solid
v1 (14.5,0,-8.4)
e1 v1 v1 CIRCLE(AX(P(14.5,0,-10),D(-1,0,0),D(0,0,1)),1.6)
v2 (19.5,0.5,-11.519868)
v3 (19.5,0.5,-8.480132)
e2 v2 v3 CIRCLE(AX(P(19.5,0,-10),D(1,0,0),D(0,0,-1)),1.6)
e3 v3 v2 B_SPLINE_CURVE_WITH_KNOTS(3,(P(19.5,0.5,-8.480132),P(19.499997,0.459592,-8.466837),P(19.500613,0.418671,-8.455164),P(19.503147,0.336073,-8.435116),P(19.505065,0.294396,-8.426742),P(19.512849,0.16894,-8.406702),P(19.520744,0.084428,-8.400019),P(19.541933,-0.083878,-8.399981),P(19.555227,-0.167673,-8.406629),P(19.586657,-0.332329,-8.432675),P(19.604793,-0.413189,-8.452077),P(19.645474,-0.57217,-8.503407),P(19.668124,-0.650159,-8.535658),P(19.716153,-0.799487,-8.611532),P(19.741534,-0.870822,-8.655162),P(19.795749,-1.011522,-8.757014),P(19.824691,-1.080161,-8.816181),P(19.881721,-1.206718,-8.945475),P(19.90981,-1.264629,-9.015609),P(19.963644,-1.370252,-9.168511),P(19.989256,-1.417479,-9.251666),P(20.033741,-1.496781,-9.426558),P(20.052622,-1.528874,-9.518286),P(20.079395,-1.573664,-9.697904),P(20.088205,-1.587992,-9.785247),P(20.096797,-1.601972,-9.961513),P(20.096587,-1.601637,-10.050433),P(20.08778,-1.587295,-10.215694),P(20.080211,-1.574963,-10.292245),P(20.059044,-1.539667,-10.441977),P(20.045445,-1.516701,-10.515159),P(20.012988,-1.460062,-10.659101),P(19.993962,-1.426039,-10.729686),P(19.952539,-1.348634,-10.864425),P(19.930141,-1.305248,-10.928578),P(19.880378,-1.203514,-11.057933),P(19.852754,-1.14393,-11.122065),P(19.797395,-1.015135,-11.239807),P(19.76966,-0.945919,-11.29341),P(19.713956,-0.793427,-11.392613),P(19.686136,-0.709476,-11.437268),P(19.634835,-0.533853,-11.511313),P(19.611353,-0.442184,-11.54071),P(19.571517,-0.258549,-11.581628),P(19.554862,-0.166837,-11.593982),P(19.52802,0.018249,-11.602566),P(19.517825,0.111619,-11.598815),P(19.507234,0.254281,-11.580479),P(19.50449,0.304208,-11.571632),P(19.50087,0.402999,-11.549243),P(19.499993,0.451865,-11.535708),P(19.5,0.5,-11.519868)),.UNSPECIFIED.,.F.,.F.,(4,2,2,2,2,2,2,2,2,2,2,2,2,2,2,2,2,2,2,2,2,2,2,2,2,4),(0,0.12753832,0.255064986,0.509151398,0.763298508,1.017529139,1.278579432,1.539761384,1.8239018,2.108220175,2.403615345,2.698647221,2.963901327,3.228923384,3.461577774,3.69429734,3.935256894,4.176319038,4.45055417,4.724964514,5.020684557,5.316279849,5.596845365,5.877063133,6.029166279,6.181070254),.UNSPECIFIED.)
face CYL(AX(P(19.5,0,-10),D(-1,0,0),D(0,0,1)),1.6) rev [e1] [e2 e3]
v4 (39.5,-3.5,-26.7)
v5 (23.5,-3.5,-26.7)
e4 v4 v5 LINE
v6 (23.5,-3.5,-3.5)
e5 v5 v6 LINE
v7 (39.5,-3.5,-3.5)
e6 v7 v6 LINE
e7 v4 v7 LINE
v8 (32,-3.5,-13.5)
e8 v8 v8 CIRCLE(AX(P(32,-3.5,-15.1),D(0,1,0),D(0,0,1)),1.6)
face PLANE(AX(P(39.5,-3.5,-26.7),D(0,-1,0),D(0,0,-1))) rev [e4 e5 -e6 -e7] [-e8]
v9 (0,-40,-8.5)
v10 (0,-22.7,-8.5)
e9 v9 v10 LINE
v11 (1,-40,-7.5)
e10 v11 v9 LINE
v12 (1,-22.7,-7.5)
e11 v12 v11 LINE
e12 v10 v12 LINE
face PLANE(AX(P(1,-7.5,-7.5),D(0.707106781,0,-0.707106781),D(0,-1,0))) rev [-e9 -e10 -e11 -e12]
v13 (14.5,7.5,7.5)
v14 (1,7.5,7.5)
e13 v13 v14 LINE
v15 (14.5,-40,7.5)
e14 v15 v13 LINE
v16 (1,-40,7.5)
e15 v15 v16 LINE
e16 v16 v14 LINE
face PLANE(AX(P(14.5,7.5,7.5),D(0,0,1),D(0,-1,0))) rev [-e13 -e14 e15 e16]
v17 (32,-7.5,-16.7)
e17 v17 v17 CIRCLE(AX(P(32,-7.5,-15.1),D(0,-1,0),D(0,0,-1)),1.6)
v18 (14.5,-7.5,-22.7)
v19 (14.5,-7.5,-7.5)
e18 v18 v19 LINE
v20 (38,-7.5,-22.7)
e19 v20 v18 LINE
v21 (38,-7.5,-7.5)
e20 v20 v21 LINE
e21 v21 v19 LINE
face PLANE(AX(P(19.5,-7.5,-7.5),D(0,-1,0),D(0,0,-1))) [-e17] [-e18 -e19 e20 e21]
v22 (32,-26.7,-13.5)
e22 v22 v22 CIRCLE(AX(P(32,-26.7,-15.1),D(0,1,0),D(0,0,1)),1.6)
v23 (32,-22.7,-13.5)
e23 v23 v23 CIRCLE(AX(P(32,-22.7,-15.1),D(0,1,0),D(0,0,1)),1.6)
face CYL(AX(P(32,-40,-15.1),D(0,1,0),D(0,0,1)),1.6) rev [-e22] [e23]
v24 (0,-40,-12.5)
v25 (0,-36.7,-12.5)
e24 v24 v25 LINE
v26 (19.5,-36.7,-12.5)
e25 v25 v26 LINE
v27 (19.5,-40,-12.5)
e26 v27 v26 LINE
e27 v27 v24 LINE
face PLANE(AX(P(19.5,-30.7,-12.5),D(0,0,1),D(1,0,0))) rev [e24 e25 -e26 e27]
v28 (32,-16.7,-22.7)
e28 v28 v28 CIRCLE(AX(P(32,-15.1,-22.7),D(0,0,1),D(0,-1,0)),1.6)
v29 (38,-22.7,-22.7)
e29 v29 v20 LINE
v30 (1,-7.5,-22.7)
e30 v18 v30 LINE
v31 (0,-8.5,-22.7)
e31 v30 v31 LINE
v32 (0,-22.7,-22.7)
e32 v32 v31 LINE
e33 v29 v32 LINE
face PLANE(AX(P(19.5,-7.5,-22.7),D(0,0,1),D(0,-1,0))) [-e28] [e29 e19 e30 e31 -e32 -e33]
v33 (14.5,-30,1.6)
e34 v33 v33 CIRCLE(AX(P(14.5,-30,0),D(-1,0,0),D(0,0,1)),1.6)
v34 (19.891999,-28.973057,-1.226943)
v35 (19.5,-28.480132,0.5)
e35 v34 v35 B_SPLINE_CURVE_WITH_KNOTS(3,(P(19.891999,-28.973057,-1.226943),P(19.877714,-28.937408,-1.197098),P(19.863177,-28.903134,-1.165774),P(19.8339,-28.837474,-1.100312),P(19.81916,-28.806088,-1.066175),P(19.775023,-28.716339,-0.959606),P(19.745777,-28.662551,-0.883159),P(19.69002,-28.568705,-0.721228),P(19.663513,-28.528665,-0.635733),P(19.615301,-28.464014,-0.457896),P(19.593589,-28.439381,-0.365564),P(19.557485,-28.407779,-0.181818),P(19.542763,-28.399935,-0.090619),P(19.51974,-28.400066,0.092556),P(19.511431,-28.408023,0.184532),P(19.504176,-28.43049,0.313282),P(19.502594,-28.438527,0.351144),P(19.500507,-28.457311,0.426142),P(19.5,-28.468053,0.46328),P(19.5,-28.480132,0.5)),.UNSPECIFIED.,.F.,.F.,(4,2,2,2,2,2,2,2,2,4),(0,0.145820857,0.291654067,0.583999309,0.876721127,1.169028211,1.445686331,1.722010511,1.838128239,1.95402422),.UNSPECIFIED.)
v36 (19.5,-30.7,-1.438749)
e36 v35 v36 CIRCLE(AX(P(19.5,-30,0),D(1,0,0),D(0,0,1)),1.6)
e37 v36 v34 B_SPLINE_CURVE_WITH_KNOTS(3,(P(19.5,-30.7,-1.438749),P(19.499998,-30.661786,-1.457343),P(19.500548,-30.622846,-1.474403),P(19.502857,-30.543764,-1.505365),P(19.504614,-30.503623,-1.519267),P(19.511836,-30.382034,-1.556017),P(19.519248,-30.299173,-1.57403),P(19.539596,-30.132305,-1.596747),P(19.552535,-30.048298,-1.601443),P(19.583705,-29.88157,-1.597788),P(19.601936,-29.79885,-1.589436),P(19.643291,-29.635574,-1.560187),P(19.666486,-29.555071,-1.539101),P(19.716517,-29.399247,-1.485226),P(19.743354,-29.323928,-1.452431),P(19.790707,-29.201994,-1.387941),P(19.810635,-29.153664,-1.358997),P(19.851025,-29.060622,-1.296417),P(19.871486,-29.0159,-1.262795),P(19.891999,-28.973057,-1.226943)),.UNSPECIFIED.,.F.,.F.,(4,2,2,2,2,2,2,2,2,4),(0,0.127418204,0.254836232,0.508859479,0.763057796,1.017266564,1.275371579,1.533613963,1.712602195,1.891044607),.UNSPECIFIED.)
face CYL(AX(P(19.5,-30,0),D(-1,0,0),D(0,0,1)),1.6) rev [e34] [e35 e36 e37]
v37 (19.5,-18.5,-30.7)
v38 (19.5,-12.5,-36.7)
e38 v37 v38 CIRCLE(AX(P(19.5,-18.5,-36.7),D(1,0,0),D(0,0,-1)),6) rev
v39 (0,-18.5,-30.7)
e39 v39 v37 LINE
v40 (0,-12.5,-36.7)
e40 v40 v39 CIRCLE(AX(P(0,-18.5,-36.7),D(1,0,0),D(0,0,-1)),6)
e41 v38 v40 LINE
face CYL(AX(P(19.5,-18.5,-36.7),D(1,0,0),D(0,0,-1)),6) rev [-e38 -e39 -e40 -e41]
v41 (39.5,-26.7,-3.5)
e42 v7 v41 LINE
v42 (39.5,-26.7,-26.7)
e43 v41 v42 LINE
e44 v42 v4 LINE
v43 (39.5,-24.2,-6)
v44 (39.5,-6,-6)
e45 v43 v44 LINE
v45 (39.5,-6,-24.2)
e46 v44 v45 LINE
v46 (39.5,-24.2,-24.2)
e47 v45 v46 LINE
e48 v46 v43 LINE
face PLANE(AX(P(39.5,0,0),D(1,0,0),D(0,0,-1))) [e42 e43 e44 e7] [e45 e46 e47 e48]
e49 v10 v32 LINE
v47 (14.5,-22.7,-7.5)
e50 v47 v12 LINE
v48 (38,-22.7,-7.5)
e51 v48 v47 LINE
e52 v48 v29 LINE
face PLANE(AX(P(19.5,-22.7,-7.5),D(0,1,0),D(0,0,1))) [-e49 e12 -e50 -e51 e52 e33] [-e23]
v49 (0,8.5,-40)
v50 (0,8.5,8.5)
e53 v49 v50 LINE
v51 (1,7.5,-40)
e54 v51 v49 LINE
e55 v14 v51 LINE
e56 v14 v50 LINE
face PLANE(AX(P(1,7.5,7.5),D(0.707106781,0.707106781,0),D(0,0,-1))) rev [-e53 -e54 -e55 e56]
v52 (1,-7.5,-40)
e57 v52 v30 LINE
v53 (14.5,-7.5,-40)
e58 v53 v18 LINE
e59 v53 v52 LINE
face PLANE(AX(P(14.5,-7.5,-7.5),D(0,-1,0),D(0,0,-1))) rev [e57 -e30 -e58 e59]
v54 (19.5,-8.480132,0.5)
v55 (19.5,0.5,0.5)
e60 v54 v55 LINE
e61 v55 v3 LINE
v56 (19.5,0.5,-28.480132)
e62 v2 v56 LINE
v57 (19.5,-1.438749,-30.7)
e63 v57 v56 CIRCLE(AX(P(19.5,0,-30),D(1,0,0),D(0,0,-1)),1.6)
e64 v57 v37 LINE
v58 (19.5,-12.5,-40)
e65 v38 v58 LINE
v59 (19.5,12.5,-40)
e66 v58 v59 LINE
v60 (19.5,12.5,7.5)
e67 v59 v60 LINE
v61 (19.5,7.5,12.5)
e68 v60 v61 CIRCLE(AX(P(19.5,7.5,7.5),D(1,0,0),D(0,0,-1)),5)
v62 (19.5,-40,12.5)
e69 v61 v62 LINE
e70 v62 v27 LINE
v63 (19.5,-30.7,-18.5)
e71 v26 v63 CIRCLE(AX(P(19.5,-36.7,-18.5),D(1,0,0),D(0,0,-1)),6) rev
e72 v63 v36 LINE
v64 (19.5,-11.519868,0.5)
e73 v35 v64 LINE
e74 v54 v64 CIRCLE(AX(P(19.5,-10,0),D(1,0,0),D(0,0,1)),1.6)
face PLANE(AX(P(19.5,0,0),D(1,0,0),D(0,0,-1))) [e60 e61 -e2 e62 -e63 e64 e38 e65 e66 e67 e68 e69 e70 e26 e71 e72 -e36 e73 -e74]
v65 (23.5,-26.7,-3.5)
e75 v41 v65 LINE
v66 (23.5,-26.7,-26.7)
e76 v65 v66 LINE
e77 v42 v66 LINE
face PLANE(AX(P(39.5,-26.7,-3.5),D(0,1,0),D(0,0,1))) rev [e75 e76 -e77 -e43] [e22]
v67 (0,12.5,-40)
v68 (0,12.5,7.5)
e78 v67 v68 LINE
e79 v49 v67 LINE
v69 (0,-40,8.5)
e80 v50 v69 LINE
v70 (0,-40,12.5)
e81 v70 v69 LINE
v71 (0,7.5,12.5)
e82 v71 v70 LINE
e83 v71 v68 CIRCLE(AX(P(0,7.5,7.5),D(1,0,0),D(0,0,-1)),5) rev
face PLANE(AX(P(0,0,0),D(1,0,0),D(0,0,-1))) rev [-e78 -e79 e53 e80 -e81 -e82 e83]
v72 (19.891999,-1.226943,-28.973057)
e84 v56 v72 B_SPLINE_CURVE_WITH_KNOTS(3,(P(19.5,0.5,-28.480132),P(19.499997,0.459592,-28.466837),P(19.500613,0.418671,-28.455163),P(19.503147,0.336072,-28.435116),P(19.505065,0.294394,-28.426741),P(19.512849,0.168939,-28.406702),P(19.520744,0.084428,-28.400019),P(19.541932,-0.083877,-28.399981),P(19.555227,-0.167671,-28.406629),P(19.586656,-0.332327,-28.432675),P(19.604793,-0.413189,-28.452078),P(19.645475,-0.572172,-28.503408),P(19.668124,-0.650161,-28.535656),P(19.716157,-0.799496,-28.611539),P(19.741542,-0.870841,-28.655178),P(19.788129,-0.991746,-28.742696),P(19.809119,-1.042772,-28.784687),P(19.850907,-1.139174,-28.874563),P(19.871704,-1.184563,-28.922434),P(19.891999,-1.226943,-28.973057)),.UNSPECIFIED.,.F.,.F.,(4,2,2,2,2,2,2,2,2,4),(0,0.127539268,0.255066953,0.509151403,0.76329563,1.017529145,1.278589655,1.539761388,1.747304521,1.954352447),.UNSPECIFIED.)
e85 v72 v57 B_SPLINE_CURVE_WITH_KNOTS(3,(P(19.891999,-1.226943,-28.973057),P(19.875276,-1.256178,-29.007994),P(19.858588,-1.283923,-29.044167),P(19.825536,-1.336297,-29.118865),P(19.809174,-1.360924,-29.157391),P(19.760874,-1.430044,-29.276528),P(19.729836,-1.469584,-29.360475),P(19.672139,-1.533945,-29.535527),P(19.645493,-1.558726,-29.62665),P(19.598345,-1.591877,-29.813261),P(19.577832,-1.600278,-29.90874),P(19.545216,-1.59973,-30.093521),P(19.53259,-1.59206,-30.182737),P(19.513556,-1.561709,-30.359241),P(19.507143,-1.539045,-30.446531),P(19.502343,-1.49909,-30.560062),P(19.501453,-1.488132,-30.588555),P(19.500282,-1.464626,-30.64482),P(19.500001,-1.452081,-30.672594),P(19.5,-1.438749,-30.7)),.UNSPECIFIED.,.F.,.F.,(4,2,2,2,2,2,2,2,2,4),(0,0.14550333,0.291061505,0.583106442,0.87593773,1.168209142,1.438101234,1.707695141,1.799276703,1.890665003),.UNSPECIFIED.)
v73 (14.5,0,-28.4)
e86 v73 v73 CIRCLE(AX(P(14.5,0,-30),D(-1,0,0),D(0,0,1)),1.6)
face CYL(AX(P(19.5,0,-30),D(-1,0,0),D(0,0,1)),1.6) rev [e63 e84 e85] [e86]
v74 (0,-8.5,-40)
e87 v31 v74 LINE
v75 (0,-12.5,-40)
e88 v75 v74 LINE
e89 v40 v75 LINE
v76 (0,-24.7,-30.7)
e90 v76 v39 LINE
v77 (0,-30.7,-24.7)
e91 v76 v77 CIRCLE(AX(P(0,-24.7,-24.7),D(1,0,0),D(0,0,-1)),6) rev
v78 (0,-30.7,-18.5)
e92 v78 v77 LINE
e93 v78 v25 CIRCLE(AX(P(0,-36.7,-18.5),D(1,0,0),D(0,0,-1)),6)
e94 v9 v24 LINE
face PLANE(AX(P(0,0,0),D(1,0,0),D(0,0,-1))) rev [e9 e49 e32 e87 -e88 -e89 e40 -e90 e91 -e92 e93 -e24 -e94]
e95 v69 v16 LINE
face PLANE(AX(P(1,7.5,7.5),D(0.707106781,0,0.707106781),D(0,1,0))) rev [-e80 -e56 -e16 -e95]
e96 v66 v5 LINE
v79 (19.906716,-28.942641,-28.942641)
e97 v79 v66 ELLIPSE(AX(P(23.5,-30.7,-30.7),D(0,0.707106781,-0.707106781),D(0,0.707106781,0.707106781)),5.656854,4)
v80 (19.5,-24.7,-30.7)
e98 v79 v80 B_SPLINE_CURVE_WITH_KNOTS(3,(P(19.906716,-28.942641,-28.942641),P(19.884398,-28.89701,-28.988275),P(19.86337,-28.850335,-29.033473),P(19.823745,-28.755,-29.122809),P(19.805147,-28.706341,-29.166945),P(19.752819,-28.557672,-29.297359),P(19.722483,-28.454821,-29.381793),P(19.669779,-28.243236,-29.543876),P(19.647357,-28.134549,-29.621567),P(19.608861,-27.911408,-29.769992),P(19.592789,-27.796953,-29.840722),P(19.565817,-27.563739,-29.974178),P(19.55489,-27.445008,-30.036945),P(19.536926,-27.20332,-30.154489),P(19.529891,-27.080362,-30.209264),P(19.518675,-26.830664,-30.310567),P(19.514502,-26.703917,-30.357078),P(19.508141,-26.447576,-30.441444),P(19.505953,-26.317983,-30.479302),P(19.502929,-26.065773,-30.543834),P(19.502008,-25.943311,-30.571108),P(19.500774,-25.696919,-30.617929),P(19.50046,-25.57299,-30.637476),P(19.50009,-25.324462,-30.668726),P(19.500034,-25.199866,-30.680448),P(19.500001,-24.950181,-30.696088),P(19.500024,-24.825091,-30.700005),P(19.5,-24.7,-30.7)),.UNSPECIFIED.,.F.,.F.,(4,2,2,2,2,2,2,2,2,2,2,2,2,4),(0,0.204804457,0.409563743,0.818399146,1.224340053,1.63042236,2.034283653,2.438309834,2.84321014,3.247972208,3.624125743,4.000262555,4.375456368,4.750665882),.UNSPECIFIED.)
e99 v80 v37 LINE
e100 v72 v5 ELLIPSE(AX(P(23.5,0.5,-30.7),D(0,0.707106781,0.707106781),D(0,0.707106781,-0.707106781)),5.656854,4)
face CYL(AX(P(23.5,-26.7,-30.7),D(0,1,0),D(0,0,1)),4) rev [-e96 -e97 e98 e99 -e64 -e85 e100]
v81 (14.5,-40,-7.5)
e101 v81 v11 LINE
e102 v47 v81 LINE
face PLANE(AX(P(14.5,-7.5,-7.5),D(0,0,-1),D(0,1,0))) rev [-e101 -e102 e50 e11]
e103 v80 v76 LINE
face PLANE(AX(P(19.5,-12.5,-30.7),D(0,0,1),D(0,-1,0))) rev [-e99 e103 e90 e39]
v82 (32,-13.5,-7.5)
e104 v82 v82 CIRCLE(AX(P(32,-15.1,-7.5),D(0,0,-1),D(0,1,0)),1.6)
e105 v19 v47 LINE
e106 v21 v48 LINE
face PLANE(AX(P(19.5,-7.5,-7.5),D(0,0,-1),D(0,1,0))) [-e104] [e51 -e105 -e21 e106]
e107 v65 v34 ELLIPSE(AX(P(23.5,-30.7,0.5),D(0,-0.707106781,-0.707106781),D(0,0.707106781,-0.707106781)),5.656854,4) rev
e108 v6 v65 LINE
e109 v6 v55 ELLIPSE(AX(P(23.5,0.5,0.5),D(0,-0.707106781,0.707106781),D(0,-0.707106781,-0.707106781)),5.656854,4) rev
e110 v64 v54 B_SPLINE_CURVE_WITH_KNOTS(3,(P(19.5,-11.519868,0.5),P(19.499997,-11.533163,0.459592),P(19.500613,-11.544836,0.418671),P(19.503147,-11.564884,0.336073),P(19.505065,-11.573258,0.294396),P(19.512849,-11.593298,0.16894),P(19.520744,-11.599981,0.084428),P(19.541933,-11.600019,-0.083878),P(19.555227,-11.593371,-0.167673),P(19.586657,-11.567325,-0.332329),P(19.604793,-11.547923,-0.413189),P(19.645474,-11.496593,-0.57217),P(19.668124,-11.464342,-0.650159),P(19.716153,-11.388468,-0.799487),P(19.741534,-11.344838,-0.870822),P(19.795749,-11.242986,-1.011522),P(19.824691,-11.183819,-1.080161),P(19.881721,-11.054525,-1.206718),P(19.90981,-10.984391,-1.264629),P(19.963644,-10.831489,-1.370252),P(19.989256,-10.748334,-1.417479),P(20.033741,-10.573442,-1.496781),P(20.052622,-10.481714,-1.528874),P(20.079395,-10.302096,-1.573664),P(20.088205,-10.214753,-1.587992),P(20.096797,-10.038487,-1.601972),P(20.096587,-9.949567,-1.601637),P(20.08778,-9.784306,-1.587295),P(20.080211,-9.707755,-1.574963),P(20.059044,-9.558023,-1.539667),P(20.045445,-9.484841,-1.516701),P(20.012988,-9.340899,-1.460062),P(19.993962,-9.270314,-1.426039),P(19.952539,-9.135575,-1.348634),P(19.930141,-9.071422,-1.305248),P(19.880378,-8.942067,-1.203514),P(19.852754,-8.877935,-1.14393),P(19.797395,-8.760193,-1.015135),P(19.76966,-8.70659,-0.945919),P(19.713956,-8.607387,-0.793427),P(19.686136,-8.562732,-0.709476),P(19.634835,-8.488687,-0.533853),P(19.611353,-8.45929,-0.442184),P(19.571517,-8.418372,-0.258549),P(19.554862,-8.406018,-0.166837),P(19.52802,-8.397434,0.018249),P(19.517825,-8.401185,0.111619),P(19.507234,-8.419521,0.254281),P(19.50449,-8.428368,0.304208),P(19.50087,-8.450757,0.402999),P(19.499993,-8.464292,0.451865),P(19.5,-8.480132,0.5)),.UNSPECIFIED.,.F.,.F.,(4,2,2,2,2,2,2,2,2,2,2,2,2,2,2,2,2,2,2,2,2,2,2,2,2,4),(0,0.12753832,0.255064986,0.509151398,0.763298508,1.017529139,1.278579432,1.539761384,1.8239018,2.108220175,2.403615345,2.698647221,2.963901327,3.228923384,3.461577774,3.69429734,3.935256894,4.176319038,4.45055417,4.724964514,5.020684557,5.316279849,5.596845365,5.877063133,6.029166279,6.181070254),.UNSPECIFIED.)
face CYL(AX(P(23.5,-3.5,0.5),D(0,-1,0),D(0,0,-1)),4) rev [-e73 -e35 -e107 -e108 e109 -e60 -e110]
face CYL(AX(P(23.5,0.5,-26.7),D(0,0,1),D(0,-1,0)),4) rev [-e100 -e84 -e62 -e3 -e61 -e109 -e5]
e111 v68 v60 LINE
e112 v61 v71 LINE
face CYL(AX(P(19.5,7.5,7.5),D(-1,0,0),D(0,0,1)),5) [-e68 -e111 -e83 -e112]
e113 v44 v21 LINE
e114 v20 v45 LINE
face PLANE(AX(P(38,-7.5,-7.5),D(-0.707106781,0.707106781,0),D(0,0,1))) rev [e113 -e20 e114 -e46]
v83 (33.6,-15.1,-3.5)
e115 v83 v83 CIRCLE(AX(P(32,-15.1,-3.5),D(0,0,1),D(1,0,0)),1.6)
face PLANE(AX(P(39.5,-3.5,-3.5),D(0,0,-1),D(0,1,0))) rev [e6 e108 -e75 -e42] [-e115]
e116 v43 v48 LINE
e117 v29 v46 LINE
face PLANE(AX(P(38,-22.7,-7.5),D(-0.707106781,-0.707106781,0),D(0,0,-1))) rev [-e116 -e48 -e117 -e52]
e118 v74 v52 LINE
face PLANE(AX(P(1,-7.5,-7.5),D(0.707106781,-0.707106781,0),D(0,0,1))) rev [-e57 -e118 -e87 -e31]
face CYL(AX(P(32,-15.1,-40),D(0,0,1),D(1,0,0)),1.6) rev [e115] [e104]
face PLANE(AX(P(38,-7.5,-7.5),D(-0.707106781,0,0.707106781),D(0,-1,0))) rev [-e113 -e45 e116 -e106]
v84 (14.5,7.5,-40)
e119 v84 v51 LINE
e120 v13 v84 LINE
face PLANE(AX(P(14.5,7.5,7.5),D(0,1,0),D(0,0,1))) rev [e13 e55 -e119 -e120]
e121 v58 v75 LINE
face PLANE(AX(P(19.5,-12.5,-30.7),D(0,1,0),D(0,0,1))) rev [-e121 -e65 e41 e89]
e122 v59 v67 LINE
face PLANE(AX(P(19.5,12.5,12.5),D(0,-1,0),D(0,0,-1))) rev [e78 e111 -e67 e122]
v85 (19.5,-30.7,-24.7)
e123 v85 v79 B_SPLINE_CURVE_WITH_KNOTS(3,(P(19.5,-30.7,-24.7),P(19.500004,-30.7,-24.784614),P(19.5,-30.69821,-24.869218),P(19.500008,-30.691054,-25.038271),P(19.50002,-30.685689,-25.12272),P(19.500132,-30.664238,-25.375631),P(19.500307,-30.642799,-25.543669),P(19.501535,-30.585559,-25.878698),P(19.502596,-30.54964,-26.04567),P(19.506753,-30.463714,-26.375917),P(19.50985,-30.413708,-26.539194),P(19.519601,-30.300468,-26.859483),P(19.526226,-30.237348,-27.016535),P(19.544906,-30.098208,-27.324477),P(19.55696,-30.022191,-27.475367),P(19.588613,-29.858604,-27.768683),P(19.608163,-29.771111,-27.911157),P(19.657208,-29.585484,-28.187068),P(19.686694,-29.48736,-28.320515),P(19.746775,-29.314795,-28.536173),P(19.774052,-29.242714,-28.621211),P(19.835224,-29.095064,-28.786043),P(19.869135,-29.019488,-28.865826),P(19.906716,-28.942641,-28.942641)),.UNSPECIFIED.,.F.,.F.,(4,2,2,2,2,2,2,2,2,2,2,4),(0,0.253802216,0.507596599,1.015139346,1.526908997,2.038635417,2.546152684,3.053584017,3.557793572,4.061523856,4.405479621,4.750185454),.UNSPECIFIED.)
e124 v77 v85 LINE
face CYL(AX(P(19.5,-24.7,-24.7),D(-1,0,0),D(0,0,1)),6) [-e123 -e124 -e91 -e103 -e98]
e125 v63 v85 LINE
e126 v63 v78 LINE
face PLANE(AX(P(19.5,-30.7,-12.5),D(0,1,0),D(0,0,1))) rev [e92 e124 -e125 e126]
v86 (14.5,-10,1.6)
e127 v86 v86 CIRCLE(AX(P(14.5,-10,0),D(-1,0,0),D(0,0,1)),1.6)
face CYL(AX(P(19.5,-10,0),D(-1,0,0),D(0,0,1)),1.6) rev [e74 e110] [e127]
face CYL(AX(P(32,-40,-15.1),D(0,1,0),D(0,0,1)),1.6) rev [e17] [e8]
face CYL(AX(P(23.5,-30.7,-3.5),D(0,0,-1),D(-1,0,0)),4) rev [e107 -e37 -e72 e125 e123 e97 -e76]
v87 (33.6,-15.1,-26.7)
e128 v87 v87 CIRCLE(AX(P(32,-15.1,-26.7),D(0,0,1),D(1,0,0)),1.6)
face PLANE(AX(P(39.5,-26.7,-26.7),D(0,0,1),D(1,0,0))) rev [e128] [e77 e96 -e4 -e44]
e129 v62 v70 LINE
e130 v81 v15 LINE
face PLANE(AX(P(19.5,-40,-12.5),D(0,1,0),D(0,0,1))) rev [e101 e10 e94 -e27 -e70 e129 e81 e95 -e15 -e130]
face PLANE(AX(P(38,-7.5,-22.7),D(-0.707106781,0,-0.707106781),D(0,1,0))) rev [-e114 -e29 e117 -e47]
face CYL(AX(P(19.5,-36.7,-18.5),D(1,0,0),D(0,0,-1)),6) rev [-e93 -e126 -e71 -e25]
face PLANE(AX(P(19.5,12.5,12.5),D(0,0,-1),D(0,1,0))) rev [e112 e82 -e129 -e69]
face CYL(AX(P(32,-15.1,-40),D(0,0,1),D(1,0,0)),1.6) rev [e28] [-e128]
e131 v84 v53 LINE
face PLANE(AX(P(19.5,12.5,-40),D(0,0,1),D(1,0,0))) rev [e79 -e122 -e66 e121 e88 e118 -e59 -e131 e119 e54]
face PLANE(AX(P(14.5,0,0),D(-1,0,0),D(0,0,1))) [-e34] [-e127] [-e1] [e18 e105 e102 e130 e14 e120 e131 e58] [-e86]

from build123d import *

# Parameters (mm, degrees)
SKETCH_1_R          = 1.6
SKETCH_1_W          = 15.2
SKETCH_1_H          = 15.2
EXTRUDE_1_DEPTH     = 19.5
CUT_EXTRUDE_1_DEPTH = 14.5
SKETCH_3_W          = 23.2
SKETCH_3_H          = 23.2
SKETCH_3_W_2        = 15.2
SKETCH_3_H_2        = 15.2
EXTRUDE_2_DEPTH     = 20
FILLET_1_R          = 4
FILLET_2_R          = 6
CHAMFER_1_SIZE      = 1.5
CHAMFER_2_SIZE      = 1
SKETCH_4_R          = 1.6
CUT_EXTRUDE_2_DEPTH = 68.026114314
SKETCH_5_R          = 1.6
CUT_EXTRUDE_3_DEPTH = 68.026114314
FILLET_3_R          = 5


with BuildPart() as part:
    # 草图1 → 凸台-拉伸1 (new body)
    with BuildSketch(Plane(origin=(0, 0, 0), x_dir=(0, 0, -1), z_dir=(1, 0, 0))):
        Polygon((12.5, -30.7), (30.7, -30.7), (30.7, -12.5), (40, -12.5), (40, 12.5), (-12.5, 12.5), (-12.5, -40), (12.5, -40), align=None)
        with Locations((10, 0)):
            Circle(SKETCH_1_R, mode=Mode.SUBTRACT)
        with Locations((30, 0)):
            Circle(SKETCH_1_R, mode=Mode.SUBTRACT)
        with Locations(Location((0, -30, 0), (0, 0, 180))):
            Circle(SKETCH_1_R, mode=Mode.SUBTRACT)
        with Locations(Location((0, -10, 0), (0, 0, 180))):
            Circle(SKETCH_1_R, mode=Mode.SUBTRACT)
        with Locations((15.1, -15.1)):
            Rectangle(SKETCH_1_W, SKETCH_1_H, mode=Mode.SUBTRACT)
    extrude(amount=EXTRUDE_1_DEPTH)

    # 草图2 → 切除-拉伸1 (cut)
    with BuildSketch(Plane.ZY):
        Polygon((7.5, 7.5), (7.5, -40), (-7.5, -40), (-7.5, -7.5), (-40, -7.5), (-40, 7.5), align=None)
    extrude(amount=-CUT_EXTRUDE_1_DEPTH, mode=Mode.SUBTRACT)

    # 草图3 → 凸台-拉伸2 (add)
    with BuildSketch(Plane(origin=(19.5, 0, 0), x_dir=(0, 0, -1), z_dir=(1, 0, 0))):
        with Locations((15.1, -15.1)):
            Rectangle(SKETCH_3_W, SKETCH_3_H)
        with Locations((15.1, -15.1)):
            Rectangle(SKETCH_3_W_2, SKETCH_3_H_2, mode=Mode.SUBTRACT)
    extrude(amount=EXTRUDE_2_DEPTH)

    # 圆角1
    # the kernel refuses this fillet: 4 mm, written as the material it adds along each edge
    with BuildSketch(Plane(origin=(19.5, -3.5, -3.5), x_dir=(0, 0, 1), z_dir=(0, -1, 0))) as fillet_1_piece_1_section:
        with BuildLine():
            CenterArc((FILLET_1_R, -FILLET_1_R), FILLET_1_R, 90, 90)
            Line((0, -FILLET_1_R), (0, 0))
            Line((0, 0), (FILLET_1_R, 0))
        make_face()
    fillet_1_piece_1 = extrude(amount=23.2, mode=Mode.PRIVATE)
    fillet_1_piece_1 = fillet_1_piece_1 - Plane(origin=(20.41689995, -10, 0), x_dir=(0, 0, 1), z_dir=(-1, 0, 0)) * Cylinder(1.6, 63, mode=Mode.PRIVATE)
    add(fillet_1_piece_1)
    with BuildSketch(Plane(origin=(19.5, -26.7, -3.5), x_dir=(0, -1, 0), z_dir=(0, 0, -1)), Plane(origin=(19.5, -26.7, -26.7), x_dir=(0, 0, -1), z_dir=(0, 1, 0))) as fillet_1_piece_2:
        with BuildLine():
            CenterArc((FILLET_1_R, -FILLET_1_R), FILLET_1_R, 90, 90)
            Line((0, -FILLET_1_R), (0, 0))
            Line((0, 0), (FILLET_1_R, 0))
        make_face()
    extrude(amount=23.2)
    with BuildSketch(Plane(origin=(19.5, -3.5, -26.7), x_dir=(0, 1, 0), z_dir=(0, 0, 1))) as fillet_1_piece_3_section:
        with BuildLine():
            CenterArc((FILLET_1_R, -FILLET_1_R), FILLET_1_R, 90, 90)
            Line((0, -FILLET_1_R), (0, 0))
            Line((0, 0), (FILLET_1_R, 0))
        make_face()
    fillet_1_piece_3 = extrude(amount=23.2, mode=Mode.PRIVATE)
    fillet_1_piece_3 = fillet_1_piece_3 - Plane(origin=(20.416900014, 0, -10), x_dir=(0, 0, -1), z_dir=(-1, 0, 0)) * Cylinder(1.6, 63, mode=Mode.PRIVATE)
    add(fillet_1_piece_3)
    with BuildSketch(Plane(origin=(19.5, -3.5, -26.7), x_dir=(0, 1, 0), z_dir=(0, 0, 1))) as fillet_1_piece_4a_section:
        with BuildLine():
            CenterArc((FILLET_1_R, -FILLET_1_R), FILLET_1_R, 90, 90)
            Line((0, -FILLET_1_R), (0, 0))
            Line((0, 0), (FILLET_1_R, 0))
        make_face()
    fillet_1_piece_4a = extrude(amount=33.2, mode=Mode.PRIVATE)
    fillet_1_piece_4a = split(fillet_1_piece_4a, bisect_by=Plane(origin=(20.405580457, -2.594419543, -3.5), z_dir=(0, 0, 1)), keep=Keep.TOP, mode=Mode.PRIVATE)
    with BuildSketch(Plane(origin=(19.5, 6.5, -3.5), x_dir=(0, 0, 1), z_dir=(0, -1, 0))) as fillet_1_piece_4b_section:
        with BuildLine():
            CenterArc((FILLET_1_R, -FILLET_1_R), FILLET_1_R, 90, 90)
            Line((0, -FILLET_1_R), (0, 0))
            Line((0, 0), (FILLET_1_R, 0))
        make_face()
    fillet_1_piece_4b = extrude(amount=33.2, mode=Mode.PRIVATE)
    fillet_1_piece_4b = split(fillet_1_piece_4b, bisect_by=Plane(origin=(20.405580457, -3.5, -2.594419543), z_dir=(0, 1, 0)), keep=Keep.TOP, mode=Mode.PRIVATE)
    fillet_1_piece_4 = fillet_1_piece_4a & fillet_1_piece_4b
    add(fillet_1_piece_4)
    with BuildSketch(Plane(origin=(19.5, -26.7, 6.5), x_dir=(0, -1, 0), z_dir=(0, 0, -1))) as fillet_1_piece_5a_section:
        with BuildLine():
            CenterArc((FILLET_1_R, -FILLET_1_R), FILLET_1_R, 90, 90)
            Line((0, -FILLET_1_R), (0, 0))
            Line((0, 0), (FILLET_1_R, 0))
        make_face()
    fillet_1_piece_5a = extrude(amount=33.2, mode=Mode.PRIVATE)
    fillet_1_piece_5a = fillet_1_piece_5a - Plane(origin=(20.438690709, -30, 0), x_dir=(0, 0, 1), z_dir=(-1, 0, 0)) * Cylinder(1.6, 83, mode=Mode.PRIVATE)
    fillet_1_piece_5a = split(fillet_1_piece_5a, bisect_by=Plane(origin=(20.438690709, -27.535460333, -3.5), z_dir=(0, 0, 1)), keep=Keep.TOP, mode=Mode.PRIVATE)
    with BuildSketch(Plane(origin=(19.5, -3.5, -3.5), x_dir=(0, 0, 1), z_dir=(0, -1, 0))) as fillet_1_piece_5b_section:
        with BuildLine():
            CenterArc((FILLET_1_R, -FILLET_1_R), FILLET_1_R, 90, 90)
            Line((0, -FILLET_1_R), (0, 0))
            Line((0, 0), (FILLET_1_R, 0))
        make_face()
    fillet_1_piece_5b = extrude(amount=33.2, mode=Mode.PRIVATE)
    fillet_1_piece_5b = fillet_1_piece_5b - Plane(origin=(20.432327139, -30, 0), x_dir=(0, 0, 1), z_dir=(-1, 0, 0)) * Cylinder(1.6, 83, mode=Mode.PRIVATE)
    fillet_1_piece_5b = split(fillet_1_piece_5b, bisect_by=Plane(origin=(20.432327139, -26.7, -2.653974982), z_dir=(0, -1, 0)), keep=Keep.TOP, mode=Mode.PRIVATE)
    fillet_1_piece_5 = fillet_1_piece_5a & fillet_1_piece_5b
    add(fillet_1_piece_5)
    with BuildSketch(Plane(origin=(19.5, -26.7, -3.5), x_dir=(0, -1, 0), z_dir=(0, 0, -1))) as fillet_1_piece_6a_section:
        with BuildLine():
            CenterArc((FILLET_1_R, -FILLET_1_R), FILLET_1_R, 90, 90)
            Line((0, -FILLET_1_R), (0, 0))
            Line((0, 0), (FILLET_1_R, 0))
        make_face()
    fillet_1_piece_6a = extrude(amount=33.2, mode=Mode.PRIVATE)
    fillet_1_piece_6a = split(fillet_1_piece_6a, bisect_by=Plane(origin=(20.405580457, -27.605580457, -30.7), z_dir=(0, 0, 1)), keep=Keep.TOP, mode=Mode.PRIVATE)
    fillet_1_piece_6a = split(fillet_1_piece_6a, bisect_by=Plane(origin=(20.405580457, -27.605580457, -26.7), z_dir=(0, 0, -1)), keep=Keep.TOP, mode=Mode.PRIVATE)
    with BuildSketch(Plane(origin=(19.5, -36.7, -26.7), x_dir=(0, 0, -1), z_dir=(0, 1, 0))) as fillet_1_piece_6b_section:
        with BuildLine():
            CenterArc((FILLET_1_R, -FILLET_1_R), FILLET_1_R, 90, 90)
            Line((0, -FILLET_1_R), (0, 0))
            Line((0, 0), (FILLET_1_R, 0))
        make_face()
    fillet_1_piece_6b = extrude(amount=33.2, mode=Mode.PRIVATE)
    fillet_1_piece_6b = split(fillet_1_piece_6b, bisect_by=Plane(origin=(20.405580457, -30.7, -27.605580457), z_dir=(0, 1, 0)), keep=Keep.TOP, mode=Mode.PRIVATE)
    fillet_1_piece_6b = split(fillet_1_piece_6b, bisect_by=Plane(origin=(20.405580457, -26.7, -27.605580457), z_dir=(0, -1, 0)), keep=Keep.TOP, mode=Mode.PRIVATE)
    fillet_1_piece_6 = fillet_1_piece_6a & fillet_1_piece_6b
    add(fillet_1_piece_6)
    with BuildSketch(Plane(origin=(19.5, -26.7, -26.7), x_dir=(0, 0, -1), z_dir=(0, 1, 0))) as fillet_1_piece_7a_section:
        with BuildLine():
            CenterArc((FILLET_1_R, -FILLET_1_R), FILLET_1_R, 90, 90)
            Line((0, -FILLET_1_R), (0, 0))
            Line((0, 0), (FILLET_1_R, 0))
        make_face()
    fillet_1_piece_7a = extrude(amount=33.2, mode=Mode.PRIVATE)
    fillet_1_piece_7a = fillet_1_piece_7a - Plane(origin=(20.438690575, 0, -30), x_dir=(0, 0, -1), z_dir=(-1, 0, 0)) * Cylinder(1.6, 83, mode=Mode.PRIVATE)
    fillet_1_piece_7a = split(fillet_1_piece_7a, bisect_by=Plane(origin=(20.438690575, -3.5, -27.535460712), z_dir=(0, 1, 0)), keep=Keep.TOP, mode=Mode.PRIVATE)
    with BuildSketch(Plane(origin=(19.5, -3.5, -36.7), x_dir=(0, 1, 0), z_dir=(0, 0, 1))) as fillet_1_piece_7b_section:
        with BuildLine():
            CenterArc((FILLET_1_R, -FILLET_1_R), FILLET_1_R, 90, 90)
            Line((0, -FILLET_1_R), (0, 0))
            Line((0, 0), (FILLET_1_R, 0))
        make_face()
    fillet_1_piece_7b = extrude(amount=33.2, mode=Mode.PRIVATE)
    fillet_1_piece_7b = fillet_1_piece_7b - Plane(origin=(20.432327238, 0, -30), x_dir=(0, 0, -1), z_dir=(-1, 0, 0)) * Cylinder(1.6, 83, mode=Mode.PRIVATE)
    fillet_1_piece_7b = split(fillet_1_piece_7b, bisect_by=Plane(origin=(20.432327238, -2.653975394, -26.7), z_dir=(0, 0, -1)), keep=Keep.TOP, mode=Mode.PRIVATE)
    fillet_1_piece_7 = fillet_1_piece_7a & fillet_1_piece_7b
    add(fillet_1_piece_7)

    # 圆角2
    # the kernel refuses this fillet: 6 mm, written as the material it adds along each edge
    with BuildSketch(Plane(origin=(0, -30.7, -12.5), x_dir=(0, 0, -1), z_dir=(1, 0, 0)), Plane(origin=(0, -12.5, -30.7), x_dir=(0, 0, -1), z_dir=(1, 0, 0))) as fillet_2_piece_1:
        with BuildLine():
            CenterArc((FILLET_2_R, -FILLET_2_R), FILLET_2_R, 90, 90)
            Line((0, -FILLET_2_R), (0, 0))
            Line((0, 0), (FILLET_2_R, 0))
        make_face()
    extrude(amount=19.5)
    # the kernel refuses this fillet: 6 mm, written as the material it takes off along each edge
    with BuildSketch(Plane(origin=(-15, -30.7, -30.7), x_dir=(0, 0, 1), z_dir=(1, 0, 0))) as fillet_2_2_piece_1:
        with BuildLine():
            CenterArc((FILLET_2_R, -FILLET_2_R), FILLET_2_R, 90, 90)
            Line((0, -FILLET_2_R), (0, 0))
            Line((0, 0), (FILLET_2_R, 0))
        make_face()
    extrude(amount=49.5, mode=Mode.SUBTRACT)

    # 倒角1
    chamfer_1_edges = [part.edges().sort_by_distance(p)[0] for p in [
        (39.5, -15.1, -7.5),
        (39.5, -22.7, -15.1),
        (39.5, -15.1, -22.7),
        (39.5, -7.5, -15.1),
    ]]
    chamfer(chamfer_1_edges, length=CHAMFER_1_SIZE)

    # 倒角2
    chamfer_2_edges = [part.edges().sort_by_distance(p)[0] for p in [
        (0, 7.5, -16.25),
        (0, -7.5, -31.35),
        (0, -31.35, -7.5),
        (0, -16.25, 7.5),
    ]]
    chamfer(chamfer_2_edges, length=CHAMFER_2_SIZE)

    # 草图4 → 切除-拉伸2 (cut, through all)
    with BuildSketch(Plane.XY.offset(-3.5)):
        with Locations((32, -15.1)):
            Circle(SKETCH_4_R)
    extrude(amount=-CUT_EXTRUDE_2_DEPTH, mode=Mode.SUBTRACT)

    # 草图5 → 切除-拉伸3 (cut, through all)
    with BuildSketch(Plane(origin=(0, -3.5, 0), x_dir=(1, 0, 0), z_dir=(0, 1, 0))):
        with Locations(Location((32, 15.1, 0), (0, 0, 270))):
            Circle(SKETCH_5_R)
    extrude(amount=-CUT_EXTRUDE_3_DEPTH, mode=Mode.SUBTRACT)

    # 圆角3
    fillet_3_edges = [part.edges().sort_by_distance(p)[0] for p in [
        (9.75, 12.5, 12.5),
    ]]
    fillet(fillet_3_edges, radius=FILLET_3_R)


solid = part.part
